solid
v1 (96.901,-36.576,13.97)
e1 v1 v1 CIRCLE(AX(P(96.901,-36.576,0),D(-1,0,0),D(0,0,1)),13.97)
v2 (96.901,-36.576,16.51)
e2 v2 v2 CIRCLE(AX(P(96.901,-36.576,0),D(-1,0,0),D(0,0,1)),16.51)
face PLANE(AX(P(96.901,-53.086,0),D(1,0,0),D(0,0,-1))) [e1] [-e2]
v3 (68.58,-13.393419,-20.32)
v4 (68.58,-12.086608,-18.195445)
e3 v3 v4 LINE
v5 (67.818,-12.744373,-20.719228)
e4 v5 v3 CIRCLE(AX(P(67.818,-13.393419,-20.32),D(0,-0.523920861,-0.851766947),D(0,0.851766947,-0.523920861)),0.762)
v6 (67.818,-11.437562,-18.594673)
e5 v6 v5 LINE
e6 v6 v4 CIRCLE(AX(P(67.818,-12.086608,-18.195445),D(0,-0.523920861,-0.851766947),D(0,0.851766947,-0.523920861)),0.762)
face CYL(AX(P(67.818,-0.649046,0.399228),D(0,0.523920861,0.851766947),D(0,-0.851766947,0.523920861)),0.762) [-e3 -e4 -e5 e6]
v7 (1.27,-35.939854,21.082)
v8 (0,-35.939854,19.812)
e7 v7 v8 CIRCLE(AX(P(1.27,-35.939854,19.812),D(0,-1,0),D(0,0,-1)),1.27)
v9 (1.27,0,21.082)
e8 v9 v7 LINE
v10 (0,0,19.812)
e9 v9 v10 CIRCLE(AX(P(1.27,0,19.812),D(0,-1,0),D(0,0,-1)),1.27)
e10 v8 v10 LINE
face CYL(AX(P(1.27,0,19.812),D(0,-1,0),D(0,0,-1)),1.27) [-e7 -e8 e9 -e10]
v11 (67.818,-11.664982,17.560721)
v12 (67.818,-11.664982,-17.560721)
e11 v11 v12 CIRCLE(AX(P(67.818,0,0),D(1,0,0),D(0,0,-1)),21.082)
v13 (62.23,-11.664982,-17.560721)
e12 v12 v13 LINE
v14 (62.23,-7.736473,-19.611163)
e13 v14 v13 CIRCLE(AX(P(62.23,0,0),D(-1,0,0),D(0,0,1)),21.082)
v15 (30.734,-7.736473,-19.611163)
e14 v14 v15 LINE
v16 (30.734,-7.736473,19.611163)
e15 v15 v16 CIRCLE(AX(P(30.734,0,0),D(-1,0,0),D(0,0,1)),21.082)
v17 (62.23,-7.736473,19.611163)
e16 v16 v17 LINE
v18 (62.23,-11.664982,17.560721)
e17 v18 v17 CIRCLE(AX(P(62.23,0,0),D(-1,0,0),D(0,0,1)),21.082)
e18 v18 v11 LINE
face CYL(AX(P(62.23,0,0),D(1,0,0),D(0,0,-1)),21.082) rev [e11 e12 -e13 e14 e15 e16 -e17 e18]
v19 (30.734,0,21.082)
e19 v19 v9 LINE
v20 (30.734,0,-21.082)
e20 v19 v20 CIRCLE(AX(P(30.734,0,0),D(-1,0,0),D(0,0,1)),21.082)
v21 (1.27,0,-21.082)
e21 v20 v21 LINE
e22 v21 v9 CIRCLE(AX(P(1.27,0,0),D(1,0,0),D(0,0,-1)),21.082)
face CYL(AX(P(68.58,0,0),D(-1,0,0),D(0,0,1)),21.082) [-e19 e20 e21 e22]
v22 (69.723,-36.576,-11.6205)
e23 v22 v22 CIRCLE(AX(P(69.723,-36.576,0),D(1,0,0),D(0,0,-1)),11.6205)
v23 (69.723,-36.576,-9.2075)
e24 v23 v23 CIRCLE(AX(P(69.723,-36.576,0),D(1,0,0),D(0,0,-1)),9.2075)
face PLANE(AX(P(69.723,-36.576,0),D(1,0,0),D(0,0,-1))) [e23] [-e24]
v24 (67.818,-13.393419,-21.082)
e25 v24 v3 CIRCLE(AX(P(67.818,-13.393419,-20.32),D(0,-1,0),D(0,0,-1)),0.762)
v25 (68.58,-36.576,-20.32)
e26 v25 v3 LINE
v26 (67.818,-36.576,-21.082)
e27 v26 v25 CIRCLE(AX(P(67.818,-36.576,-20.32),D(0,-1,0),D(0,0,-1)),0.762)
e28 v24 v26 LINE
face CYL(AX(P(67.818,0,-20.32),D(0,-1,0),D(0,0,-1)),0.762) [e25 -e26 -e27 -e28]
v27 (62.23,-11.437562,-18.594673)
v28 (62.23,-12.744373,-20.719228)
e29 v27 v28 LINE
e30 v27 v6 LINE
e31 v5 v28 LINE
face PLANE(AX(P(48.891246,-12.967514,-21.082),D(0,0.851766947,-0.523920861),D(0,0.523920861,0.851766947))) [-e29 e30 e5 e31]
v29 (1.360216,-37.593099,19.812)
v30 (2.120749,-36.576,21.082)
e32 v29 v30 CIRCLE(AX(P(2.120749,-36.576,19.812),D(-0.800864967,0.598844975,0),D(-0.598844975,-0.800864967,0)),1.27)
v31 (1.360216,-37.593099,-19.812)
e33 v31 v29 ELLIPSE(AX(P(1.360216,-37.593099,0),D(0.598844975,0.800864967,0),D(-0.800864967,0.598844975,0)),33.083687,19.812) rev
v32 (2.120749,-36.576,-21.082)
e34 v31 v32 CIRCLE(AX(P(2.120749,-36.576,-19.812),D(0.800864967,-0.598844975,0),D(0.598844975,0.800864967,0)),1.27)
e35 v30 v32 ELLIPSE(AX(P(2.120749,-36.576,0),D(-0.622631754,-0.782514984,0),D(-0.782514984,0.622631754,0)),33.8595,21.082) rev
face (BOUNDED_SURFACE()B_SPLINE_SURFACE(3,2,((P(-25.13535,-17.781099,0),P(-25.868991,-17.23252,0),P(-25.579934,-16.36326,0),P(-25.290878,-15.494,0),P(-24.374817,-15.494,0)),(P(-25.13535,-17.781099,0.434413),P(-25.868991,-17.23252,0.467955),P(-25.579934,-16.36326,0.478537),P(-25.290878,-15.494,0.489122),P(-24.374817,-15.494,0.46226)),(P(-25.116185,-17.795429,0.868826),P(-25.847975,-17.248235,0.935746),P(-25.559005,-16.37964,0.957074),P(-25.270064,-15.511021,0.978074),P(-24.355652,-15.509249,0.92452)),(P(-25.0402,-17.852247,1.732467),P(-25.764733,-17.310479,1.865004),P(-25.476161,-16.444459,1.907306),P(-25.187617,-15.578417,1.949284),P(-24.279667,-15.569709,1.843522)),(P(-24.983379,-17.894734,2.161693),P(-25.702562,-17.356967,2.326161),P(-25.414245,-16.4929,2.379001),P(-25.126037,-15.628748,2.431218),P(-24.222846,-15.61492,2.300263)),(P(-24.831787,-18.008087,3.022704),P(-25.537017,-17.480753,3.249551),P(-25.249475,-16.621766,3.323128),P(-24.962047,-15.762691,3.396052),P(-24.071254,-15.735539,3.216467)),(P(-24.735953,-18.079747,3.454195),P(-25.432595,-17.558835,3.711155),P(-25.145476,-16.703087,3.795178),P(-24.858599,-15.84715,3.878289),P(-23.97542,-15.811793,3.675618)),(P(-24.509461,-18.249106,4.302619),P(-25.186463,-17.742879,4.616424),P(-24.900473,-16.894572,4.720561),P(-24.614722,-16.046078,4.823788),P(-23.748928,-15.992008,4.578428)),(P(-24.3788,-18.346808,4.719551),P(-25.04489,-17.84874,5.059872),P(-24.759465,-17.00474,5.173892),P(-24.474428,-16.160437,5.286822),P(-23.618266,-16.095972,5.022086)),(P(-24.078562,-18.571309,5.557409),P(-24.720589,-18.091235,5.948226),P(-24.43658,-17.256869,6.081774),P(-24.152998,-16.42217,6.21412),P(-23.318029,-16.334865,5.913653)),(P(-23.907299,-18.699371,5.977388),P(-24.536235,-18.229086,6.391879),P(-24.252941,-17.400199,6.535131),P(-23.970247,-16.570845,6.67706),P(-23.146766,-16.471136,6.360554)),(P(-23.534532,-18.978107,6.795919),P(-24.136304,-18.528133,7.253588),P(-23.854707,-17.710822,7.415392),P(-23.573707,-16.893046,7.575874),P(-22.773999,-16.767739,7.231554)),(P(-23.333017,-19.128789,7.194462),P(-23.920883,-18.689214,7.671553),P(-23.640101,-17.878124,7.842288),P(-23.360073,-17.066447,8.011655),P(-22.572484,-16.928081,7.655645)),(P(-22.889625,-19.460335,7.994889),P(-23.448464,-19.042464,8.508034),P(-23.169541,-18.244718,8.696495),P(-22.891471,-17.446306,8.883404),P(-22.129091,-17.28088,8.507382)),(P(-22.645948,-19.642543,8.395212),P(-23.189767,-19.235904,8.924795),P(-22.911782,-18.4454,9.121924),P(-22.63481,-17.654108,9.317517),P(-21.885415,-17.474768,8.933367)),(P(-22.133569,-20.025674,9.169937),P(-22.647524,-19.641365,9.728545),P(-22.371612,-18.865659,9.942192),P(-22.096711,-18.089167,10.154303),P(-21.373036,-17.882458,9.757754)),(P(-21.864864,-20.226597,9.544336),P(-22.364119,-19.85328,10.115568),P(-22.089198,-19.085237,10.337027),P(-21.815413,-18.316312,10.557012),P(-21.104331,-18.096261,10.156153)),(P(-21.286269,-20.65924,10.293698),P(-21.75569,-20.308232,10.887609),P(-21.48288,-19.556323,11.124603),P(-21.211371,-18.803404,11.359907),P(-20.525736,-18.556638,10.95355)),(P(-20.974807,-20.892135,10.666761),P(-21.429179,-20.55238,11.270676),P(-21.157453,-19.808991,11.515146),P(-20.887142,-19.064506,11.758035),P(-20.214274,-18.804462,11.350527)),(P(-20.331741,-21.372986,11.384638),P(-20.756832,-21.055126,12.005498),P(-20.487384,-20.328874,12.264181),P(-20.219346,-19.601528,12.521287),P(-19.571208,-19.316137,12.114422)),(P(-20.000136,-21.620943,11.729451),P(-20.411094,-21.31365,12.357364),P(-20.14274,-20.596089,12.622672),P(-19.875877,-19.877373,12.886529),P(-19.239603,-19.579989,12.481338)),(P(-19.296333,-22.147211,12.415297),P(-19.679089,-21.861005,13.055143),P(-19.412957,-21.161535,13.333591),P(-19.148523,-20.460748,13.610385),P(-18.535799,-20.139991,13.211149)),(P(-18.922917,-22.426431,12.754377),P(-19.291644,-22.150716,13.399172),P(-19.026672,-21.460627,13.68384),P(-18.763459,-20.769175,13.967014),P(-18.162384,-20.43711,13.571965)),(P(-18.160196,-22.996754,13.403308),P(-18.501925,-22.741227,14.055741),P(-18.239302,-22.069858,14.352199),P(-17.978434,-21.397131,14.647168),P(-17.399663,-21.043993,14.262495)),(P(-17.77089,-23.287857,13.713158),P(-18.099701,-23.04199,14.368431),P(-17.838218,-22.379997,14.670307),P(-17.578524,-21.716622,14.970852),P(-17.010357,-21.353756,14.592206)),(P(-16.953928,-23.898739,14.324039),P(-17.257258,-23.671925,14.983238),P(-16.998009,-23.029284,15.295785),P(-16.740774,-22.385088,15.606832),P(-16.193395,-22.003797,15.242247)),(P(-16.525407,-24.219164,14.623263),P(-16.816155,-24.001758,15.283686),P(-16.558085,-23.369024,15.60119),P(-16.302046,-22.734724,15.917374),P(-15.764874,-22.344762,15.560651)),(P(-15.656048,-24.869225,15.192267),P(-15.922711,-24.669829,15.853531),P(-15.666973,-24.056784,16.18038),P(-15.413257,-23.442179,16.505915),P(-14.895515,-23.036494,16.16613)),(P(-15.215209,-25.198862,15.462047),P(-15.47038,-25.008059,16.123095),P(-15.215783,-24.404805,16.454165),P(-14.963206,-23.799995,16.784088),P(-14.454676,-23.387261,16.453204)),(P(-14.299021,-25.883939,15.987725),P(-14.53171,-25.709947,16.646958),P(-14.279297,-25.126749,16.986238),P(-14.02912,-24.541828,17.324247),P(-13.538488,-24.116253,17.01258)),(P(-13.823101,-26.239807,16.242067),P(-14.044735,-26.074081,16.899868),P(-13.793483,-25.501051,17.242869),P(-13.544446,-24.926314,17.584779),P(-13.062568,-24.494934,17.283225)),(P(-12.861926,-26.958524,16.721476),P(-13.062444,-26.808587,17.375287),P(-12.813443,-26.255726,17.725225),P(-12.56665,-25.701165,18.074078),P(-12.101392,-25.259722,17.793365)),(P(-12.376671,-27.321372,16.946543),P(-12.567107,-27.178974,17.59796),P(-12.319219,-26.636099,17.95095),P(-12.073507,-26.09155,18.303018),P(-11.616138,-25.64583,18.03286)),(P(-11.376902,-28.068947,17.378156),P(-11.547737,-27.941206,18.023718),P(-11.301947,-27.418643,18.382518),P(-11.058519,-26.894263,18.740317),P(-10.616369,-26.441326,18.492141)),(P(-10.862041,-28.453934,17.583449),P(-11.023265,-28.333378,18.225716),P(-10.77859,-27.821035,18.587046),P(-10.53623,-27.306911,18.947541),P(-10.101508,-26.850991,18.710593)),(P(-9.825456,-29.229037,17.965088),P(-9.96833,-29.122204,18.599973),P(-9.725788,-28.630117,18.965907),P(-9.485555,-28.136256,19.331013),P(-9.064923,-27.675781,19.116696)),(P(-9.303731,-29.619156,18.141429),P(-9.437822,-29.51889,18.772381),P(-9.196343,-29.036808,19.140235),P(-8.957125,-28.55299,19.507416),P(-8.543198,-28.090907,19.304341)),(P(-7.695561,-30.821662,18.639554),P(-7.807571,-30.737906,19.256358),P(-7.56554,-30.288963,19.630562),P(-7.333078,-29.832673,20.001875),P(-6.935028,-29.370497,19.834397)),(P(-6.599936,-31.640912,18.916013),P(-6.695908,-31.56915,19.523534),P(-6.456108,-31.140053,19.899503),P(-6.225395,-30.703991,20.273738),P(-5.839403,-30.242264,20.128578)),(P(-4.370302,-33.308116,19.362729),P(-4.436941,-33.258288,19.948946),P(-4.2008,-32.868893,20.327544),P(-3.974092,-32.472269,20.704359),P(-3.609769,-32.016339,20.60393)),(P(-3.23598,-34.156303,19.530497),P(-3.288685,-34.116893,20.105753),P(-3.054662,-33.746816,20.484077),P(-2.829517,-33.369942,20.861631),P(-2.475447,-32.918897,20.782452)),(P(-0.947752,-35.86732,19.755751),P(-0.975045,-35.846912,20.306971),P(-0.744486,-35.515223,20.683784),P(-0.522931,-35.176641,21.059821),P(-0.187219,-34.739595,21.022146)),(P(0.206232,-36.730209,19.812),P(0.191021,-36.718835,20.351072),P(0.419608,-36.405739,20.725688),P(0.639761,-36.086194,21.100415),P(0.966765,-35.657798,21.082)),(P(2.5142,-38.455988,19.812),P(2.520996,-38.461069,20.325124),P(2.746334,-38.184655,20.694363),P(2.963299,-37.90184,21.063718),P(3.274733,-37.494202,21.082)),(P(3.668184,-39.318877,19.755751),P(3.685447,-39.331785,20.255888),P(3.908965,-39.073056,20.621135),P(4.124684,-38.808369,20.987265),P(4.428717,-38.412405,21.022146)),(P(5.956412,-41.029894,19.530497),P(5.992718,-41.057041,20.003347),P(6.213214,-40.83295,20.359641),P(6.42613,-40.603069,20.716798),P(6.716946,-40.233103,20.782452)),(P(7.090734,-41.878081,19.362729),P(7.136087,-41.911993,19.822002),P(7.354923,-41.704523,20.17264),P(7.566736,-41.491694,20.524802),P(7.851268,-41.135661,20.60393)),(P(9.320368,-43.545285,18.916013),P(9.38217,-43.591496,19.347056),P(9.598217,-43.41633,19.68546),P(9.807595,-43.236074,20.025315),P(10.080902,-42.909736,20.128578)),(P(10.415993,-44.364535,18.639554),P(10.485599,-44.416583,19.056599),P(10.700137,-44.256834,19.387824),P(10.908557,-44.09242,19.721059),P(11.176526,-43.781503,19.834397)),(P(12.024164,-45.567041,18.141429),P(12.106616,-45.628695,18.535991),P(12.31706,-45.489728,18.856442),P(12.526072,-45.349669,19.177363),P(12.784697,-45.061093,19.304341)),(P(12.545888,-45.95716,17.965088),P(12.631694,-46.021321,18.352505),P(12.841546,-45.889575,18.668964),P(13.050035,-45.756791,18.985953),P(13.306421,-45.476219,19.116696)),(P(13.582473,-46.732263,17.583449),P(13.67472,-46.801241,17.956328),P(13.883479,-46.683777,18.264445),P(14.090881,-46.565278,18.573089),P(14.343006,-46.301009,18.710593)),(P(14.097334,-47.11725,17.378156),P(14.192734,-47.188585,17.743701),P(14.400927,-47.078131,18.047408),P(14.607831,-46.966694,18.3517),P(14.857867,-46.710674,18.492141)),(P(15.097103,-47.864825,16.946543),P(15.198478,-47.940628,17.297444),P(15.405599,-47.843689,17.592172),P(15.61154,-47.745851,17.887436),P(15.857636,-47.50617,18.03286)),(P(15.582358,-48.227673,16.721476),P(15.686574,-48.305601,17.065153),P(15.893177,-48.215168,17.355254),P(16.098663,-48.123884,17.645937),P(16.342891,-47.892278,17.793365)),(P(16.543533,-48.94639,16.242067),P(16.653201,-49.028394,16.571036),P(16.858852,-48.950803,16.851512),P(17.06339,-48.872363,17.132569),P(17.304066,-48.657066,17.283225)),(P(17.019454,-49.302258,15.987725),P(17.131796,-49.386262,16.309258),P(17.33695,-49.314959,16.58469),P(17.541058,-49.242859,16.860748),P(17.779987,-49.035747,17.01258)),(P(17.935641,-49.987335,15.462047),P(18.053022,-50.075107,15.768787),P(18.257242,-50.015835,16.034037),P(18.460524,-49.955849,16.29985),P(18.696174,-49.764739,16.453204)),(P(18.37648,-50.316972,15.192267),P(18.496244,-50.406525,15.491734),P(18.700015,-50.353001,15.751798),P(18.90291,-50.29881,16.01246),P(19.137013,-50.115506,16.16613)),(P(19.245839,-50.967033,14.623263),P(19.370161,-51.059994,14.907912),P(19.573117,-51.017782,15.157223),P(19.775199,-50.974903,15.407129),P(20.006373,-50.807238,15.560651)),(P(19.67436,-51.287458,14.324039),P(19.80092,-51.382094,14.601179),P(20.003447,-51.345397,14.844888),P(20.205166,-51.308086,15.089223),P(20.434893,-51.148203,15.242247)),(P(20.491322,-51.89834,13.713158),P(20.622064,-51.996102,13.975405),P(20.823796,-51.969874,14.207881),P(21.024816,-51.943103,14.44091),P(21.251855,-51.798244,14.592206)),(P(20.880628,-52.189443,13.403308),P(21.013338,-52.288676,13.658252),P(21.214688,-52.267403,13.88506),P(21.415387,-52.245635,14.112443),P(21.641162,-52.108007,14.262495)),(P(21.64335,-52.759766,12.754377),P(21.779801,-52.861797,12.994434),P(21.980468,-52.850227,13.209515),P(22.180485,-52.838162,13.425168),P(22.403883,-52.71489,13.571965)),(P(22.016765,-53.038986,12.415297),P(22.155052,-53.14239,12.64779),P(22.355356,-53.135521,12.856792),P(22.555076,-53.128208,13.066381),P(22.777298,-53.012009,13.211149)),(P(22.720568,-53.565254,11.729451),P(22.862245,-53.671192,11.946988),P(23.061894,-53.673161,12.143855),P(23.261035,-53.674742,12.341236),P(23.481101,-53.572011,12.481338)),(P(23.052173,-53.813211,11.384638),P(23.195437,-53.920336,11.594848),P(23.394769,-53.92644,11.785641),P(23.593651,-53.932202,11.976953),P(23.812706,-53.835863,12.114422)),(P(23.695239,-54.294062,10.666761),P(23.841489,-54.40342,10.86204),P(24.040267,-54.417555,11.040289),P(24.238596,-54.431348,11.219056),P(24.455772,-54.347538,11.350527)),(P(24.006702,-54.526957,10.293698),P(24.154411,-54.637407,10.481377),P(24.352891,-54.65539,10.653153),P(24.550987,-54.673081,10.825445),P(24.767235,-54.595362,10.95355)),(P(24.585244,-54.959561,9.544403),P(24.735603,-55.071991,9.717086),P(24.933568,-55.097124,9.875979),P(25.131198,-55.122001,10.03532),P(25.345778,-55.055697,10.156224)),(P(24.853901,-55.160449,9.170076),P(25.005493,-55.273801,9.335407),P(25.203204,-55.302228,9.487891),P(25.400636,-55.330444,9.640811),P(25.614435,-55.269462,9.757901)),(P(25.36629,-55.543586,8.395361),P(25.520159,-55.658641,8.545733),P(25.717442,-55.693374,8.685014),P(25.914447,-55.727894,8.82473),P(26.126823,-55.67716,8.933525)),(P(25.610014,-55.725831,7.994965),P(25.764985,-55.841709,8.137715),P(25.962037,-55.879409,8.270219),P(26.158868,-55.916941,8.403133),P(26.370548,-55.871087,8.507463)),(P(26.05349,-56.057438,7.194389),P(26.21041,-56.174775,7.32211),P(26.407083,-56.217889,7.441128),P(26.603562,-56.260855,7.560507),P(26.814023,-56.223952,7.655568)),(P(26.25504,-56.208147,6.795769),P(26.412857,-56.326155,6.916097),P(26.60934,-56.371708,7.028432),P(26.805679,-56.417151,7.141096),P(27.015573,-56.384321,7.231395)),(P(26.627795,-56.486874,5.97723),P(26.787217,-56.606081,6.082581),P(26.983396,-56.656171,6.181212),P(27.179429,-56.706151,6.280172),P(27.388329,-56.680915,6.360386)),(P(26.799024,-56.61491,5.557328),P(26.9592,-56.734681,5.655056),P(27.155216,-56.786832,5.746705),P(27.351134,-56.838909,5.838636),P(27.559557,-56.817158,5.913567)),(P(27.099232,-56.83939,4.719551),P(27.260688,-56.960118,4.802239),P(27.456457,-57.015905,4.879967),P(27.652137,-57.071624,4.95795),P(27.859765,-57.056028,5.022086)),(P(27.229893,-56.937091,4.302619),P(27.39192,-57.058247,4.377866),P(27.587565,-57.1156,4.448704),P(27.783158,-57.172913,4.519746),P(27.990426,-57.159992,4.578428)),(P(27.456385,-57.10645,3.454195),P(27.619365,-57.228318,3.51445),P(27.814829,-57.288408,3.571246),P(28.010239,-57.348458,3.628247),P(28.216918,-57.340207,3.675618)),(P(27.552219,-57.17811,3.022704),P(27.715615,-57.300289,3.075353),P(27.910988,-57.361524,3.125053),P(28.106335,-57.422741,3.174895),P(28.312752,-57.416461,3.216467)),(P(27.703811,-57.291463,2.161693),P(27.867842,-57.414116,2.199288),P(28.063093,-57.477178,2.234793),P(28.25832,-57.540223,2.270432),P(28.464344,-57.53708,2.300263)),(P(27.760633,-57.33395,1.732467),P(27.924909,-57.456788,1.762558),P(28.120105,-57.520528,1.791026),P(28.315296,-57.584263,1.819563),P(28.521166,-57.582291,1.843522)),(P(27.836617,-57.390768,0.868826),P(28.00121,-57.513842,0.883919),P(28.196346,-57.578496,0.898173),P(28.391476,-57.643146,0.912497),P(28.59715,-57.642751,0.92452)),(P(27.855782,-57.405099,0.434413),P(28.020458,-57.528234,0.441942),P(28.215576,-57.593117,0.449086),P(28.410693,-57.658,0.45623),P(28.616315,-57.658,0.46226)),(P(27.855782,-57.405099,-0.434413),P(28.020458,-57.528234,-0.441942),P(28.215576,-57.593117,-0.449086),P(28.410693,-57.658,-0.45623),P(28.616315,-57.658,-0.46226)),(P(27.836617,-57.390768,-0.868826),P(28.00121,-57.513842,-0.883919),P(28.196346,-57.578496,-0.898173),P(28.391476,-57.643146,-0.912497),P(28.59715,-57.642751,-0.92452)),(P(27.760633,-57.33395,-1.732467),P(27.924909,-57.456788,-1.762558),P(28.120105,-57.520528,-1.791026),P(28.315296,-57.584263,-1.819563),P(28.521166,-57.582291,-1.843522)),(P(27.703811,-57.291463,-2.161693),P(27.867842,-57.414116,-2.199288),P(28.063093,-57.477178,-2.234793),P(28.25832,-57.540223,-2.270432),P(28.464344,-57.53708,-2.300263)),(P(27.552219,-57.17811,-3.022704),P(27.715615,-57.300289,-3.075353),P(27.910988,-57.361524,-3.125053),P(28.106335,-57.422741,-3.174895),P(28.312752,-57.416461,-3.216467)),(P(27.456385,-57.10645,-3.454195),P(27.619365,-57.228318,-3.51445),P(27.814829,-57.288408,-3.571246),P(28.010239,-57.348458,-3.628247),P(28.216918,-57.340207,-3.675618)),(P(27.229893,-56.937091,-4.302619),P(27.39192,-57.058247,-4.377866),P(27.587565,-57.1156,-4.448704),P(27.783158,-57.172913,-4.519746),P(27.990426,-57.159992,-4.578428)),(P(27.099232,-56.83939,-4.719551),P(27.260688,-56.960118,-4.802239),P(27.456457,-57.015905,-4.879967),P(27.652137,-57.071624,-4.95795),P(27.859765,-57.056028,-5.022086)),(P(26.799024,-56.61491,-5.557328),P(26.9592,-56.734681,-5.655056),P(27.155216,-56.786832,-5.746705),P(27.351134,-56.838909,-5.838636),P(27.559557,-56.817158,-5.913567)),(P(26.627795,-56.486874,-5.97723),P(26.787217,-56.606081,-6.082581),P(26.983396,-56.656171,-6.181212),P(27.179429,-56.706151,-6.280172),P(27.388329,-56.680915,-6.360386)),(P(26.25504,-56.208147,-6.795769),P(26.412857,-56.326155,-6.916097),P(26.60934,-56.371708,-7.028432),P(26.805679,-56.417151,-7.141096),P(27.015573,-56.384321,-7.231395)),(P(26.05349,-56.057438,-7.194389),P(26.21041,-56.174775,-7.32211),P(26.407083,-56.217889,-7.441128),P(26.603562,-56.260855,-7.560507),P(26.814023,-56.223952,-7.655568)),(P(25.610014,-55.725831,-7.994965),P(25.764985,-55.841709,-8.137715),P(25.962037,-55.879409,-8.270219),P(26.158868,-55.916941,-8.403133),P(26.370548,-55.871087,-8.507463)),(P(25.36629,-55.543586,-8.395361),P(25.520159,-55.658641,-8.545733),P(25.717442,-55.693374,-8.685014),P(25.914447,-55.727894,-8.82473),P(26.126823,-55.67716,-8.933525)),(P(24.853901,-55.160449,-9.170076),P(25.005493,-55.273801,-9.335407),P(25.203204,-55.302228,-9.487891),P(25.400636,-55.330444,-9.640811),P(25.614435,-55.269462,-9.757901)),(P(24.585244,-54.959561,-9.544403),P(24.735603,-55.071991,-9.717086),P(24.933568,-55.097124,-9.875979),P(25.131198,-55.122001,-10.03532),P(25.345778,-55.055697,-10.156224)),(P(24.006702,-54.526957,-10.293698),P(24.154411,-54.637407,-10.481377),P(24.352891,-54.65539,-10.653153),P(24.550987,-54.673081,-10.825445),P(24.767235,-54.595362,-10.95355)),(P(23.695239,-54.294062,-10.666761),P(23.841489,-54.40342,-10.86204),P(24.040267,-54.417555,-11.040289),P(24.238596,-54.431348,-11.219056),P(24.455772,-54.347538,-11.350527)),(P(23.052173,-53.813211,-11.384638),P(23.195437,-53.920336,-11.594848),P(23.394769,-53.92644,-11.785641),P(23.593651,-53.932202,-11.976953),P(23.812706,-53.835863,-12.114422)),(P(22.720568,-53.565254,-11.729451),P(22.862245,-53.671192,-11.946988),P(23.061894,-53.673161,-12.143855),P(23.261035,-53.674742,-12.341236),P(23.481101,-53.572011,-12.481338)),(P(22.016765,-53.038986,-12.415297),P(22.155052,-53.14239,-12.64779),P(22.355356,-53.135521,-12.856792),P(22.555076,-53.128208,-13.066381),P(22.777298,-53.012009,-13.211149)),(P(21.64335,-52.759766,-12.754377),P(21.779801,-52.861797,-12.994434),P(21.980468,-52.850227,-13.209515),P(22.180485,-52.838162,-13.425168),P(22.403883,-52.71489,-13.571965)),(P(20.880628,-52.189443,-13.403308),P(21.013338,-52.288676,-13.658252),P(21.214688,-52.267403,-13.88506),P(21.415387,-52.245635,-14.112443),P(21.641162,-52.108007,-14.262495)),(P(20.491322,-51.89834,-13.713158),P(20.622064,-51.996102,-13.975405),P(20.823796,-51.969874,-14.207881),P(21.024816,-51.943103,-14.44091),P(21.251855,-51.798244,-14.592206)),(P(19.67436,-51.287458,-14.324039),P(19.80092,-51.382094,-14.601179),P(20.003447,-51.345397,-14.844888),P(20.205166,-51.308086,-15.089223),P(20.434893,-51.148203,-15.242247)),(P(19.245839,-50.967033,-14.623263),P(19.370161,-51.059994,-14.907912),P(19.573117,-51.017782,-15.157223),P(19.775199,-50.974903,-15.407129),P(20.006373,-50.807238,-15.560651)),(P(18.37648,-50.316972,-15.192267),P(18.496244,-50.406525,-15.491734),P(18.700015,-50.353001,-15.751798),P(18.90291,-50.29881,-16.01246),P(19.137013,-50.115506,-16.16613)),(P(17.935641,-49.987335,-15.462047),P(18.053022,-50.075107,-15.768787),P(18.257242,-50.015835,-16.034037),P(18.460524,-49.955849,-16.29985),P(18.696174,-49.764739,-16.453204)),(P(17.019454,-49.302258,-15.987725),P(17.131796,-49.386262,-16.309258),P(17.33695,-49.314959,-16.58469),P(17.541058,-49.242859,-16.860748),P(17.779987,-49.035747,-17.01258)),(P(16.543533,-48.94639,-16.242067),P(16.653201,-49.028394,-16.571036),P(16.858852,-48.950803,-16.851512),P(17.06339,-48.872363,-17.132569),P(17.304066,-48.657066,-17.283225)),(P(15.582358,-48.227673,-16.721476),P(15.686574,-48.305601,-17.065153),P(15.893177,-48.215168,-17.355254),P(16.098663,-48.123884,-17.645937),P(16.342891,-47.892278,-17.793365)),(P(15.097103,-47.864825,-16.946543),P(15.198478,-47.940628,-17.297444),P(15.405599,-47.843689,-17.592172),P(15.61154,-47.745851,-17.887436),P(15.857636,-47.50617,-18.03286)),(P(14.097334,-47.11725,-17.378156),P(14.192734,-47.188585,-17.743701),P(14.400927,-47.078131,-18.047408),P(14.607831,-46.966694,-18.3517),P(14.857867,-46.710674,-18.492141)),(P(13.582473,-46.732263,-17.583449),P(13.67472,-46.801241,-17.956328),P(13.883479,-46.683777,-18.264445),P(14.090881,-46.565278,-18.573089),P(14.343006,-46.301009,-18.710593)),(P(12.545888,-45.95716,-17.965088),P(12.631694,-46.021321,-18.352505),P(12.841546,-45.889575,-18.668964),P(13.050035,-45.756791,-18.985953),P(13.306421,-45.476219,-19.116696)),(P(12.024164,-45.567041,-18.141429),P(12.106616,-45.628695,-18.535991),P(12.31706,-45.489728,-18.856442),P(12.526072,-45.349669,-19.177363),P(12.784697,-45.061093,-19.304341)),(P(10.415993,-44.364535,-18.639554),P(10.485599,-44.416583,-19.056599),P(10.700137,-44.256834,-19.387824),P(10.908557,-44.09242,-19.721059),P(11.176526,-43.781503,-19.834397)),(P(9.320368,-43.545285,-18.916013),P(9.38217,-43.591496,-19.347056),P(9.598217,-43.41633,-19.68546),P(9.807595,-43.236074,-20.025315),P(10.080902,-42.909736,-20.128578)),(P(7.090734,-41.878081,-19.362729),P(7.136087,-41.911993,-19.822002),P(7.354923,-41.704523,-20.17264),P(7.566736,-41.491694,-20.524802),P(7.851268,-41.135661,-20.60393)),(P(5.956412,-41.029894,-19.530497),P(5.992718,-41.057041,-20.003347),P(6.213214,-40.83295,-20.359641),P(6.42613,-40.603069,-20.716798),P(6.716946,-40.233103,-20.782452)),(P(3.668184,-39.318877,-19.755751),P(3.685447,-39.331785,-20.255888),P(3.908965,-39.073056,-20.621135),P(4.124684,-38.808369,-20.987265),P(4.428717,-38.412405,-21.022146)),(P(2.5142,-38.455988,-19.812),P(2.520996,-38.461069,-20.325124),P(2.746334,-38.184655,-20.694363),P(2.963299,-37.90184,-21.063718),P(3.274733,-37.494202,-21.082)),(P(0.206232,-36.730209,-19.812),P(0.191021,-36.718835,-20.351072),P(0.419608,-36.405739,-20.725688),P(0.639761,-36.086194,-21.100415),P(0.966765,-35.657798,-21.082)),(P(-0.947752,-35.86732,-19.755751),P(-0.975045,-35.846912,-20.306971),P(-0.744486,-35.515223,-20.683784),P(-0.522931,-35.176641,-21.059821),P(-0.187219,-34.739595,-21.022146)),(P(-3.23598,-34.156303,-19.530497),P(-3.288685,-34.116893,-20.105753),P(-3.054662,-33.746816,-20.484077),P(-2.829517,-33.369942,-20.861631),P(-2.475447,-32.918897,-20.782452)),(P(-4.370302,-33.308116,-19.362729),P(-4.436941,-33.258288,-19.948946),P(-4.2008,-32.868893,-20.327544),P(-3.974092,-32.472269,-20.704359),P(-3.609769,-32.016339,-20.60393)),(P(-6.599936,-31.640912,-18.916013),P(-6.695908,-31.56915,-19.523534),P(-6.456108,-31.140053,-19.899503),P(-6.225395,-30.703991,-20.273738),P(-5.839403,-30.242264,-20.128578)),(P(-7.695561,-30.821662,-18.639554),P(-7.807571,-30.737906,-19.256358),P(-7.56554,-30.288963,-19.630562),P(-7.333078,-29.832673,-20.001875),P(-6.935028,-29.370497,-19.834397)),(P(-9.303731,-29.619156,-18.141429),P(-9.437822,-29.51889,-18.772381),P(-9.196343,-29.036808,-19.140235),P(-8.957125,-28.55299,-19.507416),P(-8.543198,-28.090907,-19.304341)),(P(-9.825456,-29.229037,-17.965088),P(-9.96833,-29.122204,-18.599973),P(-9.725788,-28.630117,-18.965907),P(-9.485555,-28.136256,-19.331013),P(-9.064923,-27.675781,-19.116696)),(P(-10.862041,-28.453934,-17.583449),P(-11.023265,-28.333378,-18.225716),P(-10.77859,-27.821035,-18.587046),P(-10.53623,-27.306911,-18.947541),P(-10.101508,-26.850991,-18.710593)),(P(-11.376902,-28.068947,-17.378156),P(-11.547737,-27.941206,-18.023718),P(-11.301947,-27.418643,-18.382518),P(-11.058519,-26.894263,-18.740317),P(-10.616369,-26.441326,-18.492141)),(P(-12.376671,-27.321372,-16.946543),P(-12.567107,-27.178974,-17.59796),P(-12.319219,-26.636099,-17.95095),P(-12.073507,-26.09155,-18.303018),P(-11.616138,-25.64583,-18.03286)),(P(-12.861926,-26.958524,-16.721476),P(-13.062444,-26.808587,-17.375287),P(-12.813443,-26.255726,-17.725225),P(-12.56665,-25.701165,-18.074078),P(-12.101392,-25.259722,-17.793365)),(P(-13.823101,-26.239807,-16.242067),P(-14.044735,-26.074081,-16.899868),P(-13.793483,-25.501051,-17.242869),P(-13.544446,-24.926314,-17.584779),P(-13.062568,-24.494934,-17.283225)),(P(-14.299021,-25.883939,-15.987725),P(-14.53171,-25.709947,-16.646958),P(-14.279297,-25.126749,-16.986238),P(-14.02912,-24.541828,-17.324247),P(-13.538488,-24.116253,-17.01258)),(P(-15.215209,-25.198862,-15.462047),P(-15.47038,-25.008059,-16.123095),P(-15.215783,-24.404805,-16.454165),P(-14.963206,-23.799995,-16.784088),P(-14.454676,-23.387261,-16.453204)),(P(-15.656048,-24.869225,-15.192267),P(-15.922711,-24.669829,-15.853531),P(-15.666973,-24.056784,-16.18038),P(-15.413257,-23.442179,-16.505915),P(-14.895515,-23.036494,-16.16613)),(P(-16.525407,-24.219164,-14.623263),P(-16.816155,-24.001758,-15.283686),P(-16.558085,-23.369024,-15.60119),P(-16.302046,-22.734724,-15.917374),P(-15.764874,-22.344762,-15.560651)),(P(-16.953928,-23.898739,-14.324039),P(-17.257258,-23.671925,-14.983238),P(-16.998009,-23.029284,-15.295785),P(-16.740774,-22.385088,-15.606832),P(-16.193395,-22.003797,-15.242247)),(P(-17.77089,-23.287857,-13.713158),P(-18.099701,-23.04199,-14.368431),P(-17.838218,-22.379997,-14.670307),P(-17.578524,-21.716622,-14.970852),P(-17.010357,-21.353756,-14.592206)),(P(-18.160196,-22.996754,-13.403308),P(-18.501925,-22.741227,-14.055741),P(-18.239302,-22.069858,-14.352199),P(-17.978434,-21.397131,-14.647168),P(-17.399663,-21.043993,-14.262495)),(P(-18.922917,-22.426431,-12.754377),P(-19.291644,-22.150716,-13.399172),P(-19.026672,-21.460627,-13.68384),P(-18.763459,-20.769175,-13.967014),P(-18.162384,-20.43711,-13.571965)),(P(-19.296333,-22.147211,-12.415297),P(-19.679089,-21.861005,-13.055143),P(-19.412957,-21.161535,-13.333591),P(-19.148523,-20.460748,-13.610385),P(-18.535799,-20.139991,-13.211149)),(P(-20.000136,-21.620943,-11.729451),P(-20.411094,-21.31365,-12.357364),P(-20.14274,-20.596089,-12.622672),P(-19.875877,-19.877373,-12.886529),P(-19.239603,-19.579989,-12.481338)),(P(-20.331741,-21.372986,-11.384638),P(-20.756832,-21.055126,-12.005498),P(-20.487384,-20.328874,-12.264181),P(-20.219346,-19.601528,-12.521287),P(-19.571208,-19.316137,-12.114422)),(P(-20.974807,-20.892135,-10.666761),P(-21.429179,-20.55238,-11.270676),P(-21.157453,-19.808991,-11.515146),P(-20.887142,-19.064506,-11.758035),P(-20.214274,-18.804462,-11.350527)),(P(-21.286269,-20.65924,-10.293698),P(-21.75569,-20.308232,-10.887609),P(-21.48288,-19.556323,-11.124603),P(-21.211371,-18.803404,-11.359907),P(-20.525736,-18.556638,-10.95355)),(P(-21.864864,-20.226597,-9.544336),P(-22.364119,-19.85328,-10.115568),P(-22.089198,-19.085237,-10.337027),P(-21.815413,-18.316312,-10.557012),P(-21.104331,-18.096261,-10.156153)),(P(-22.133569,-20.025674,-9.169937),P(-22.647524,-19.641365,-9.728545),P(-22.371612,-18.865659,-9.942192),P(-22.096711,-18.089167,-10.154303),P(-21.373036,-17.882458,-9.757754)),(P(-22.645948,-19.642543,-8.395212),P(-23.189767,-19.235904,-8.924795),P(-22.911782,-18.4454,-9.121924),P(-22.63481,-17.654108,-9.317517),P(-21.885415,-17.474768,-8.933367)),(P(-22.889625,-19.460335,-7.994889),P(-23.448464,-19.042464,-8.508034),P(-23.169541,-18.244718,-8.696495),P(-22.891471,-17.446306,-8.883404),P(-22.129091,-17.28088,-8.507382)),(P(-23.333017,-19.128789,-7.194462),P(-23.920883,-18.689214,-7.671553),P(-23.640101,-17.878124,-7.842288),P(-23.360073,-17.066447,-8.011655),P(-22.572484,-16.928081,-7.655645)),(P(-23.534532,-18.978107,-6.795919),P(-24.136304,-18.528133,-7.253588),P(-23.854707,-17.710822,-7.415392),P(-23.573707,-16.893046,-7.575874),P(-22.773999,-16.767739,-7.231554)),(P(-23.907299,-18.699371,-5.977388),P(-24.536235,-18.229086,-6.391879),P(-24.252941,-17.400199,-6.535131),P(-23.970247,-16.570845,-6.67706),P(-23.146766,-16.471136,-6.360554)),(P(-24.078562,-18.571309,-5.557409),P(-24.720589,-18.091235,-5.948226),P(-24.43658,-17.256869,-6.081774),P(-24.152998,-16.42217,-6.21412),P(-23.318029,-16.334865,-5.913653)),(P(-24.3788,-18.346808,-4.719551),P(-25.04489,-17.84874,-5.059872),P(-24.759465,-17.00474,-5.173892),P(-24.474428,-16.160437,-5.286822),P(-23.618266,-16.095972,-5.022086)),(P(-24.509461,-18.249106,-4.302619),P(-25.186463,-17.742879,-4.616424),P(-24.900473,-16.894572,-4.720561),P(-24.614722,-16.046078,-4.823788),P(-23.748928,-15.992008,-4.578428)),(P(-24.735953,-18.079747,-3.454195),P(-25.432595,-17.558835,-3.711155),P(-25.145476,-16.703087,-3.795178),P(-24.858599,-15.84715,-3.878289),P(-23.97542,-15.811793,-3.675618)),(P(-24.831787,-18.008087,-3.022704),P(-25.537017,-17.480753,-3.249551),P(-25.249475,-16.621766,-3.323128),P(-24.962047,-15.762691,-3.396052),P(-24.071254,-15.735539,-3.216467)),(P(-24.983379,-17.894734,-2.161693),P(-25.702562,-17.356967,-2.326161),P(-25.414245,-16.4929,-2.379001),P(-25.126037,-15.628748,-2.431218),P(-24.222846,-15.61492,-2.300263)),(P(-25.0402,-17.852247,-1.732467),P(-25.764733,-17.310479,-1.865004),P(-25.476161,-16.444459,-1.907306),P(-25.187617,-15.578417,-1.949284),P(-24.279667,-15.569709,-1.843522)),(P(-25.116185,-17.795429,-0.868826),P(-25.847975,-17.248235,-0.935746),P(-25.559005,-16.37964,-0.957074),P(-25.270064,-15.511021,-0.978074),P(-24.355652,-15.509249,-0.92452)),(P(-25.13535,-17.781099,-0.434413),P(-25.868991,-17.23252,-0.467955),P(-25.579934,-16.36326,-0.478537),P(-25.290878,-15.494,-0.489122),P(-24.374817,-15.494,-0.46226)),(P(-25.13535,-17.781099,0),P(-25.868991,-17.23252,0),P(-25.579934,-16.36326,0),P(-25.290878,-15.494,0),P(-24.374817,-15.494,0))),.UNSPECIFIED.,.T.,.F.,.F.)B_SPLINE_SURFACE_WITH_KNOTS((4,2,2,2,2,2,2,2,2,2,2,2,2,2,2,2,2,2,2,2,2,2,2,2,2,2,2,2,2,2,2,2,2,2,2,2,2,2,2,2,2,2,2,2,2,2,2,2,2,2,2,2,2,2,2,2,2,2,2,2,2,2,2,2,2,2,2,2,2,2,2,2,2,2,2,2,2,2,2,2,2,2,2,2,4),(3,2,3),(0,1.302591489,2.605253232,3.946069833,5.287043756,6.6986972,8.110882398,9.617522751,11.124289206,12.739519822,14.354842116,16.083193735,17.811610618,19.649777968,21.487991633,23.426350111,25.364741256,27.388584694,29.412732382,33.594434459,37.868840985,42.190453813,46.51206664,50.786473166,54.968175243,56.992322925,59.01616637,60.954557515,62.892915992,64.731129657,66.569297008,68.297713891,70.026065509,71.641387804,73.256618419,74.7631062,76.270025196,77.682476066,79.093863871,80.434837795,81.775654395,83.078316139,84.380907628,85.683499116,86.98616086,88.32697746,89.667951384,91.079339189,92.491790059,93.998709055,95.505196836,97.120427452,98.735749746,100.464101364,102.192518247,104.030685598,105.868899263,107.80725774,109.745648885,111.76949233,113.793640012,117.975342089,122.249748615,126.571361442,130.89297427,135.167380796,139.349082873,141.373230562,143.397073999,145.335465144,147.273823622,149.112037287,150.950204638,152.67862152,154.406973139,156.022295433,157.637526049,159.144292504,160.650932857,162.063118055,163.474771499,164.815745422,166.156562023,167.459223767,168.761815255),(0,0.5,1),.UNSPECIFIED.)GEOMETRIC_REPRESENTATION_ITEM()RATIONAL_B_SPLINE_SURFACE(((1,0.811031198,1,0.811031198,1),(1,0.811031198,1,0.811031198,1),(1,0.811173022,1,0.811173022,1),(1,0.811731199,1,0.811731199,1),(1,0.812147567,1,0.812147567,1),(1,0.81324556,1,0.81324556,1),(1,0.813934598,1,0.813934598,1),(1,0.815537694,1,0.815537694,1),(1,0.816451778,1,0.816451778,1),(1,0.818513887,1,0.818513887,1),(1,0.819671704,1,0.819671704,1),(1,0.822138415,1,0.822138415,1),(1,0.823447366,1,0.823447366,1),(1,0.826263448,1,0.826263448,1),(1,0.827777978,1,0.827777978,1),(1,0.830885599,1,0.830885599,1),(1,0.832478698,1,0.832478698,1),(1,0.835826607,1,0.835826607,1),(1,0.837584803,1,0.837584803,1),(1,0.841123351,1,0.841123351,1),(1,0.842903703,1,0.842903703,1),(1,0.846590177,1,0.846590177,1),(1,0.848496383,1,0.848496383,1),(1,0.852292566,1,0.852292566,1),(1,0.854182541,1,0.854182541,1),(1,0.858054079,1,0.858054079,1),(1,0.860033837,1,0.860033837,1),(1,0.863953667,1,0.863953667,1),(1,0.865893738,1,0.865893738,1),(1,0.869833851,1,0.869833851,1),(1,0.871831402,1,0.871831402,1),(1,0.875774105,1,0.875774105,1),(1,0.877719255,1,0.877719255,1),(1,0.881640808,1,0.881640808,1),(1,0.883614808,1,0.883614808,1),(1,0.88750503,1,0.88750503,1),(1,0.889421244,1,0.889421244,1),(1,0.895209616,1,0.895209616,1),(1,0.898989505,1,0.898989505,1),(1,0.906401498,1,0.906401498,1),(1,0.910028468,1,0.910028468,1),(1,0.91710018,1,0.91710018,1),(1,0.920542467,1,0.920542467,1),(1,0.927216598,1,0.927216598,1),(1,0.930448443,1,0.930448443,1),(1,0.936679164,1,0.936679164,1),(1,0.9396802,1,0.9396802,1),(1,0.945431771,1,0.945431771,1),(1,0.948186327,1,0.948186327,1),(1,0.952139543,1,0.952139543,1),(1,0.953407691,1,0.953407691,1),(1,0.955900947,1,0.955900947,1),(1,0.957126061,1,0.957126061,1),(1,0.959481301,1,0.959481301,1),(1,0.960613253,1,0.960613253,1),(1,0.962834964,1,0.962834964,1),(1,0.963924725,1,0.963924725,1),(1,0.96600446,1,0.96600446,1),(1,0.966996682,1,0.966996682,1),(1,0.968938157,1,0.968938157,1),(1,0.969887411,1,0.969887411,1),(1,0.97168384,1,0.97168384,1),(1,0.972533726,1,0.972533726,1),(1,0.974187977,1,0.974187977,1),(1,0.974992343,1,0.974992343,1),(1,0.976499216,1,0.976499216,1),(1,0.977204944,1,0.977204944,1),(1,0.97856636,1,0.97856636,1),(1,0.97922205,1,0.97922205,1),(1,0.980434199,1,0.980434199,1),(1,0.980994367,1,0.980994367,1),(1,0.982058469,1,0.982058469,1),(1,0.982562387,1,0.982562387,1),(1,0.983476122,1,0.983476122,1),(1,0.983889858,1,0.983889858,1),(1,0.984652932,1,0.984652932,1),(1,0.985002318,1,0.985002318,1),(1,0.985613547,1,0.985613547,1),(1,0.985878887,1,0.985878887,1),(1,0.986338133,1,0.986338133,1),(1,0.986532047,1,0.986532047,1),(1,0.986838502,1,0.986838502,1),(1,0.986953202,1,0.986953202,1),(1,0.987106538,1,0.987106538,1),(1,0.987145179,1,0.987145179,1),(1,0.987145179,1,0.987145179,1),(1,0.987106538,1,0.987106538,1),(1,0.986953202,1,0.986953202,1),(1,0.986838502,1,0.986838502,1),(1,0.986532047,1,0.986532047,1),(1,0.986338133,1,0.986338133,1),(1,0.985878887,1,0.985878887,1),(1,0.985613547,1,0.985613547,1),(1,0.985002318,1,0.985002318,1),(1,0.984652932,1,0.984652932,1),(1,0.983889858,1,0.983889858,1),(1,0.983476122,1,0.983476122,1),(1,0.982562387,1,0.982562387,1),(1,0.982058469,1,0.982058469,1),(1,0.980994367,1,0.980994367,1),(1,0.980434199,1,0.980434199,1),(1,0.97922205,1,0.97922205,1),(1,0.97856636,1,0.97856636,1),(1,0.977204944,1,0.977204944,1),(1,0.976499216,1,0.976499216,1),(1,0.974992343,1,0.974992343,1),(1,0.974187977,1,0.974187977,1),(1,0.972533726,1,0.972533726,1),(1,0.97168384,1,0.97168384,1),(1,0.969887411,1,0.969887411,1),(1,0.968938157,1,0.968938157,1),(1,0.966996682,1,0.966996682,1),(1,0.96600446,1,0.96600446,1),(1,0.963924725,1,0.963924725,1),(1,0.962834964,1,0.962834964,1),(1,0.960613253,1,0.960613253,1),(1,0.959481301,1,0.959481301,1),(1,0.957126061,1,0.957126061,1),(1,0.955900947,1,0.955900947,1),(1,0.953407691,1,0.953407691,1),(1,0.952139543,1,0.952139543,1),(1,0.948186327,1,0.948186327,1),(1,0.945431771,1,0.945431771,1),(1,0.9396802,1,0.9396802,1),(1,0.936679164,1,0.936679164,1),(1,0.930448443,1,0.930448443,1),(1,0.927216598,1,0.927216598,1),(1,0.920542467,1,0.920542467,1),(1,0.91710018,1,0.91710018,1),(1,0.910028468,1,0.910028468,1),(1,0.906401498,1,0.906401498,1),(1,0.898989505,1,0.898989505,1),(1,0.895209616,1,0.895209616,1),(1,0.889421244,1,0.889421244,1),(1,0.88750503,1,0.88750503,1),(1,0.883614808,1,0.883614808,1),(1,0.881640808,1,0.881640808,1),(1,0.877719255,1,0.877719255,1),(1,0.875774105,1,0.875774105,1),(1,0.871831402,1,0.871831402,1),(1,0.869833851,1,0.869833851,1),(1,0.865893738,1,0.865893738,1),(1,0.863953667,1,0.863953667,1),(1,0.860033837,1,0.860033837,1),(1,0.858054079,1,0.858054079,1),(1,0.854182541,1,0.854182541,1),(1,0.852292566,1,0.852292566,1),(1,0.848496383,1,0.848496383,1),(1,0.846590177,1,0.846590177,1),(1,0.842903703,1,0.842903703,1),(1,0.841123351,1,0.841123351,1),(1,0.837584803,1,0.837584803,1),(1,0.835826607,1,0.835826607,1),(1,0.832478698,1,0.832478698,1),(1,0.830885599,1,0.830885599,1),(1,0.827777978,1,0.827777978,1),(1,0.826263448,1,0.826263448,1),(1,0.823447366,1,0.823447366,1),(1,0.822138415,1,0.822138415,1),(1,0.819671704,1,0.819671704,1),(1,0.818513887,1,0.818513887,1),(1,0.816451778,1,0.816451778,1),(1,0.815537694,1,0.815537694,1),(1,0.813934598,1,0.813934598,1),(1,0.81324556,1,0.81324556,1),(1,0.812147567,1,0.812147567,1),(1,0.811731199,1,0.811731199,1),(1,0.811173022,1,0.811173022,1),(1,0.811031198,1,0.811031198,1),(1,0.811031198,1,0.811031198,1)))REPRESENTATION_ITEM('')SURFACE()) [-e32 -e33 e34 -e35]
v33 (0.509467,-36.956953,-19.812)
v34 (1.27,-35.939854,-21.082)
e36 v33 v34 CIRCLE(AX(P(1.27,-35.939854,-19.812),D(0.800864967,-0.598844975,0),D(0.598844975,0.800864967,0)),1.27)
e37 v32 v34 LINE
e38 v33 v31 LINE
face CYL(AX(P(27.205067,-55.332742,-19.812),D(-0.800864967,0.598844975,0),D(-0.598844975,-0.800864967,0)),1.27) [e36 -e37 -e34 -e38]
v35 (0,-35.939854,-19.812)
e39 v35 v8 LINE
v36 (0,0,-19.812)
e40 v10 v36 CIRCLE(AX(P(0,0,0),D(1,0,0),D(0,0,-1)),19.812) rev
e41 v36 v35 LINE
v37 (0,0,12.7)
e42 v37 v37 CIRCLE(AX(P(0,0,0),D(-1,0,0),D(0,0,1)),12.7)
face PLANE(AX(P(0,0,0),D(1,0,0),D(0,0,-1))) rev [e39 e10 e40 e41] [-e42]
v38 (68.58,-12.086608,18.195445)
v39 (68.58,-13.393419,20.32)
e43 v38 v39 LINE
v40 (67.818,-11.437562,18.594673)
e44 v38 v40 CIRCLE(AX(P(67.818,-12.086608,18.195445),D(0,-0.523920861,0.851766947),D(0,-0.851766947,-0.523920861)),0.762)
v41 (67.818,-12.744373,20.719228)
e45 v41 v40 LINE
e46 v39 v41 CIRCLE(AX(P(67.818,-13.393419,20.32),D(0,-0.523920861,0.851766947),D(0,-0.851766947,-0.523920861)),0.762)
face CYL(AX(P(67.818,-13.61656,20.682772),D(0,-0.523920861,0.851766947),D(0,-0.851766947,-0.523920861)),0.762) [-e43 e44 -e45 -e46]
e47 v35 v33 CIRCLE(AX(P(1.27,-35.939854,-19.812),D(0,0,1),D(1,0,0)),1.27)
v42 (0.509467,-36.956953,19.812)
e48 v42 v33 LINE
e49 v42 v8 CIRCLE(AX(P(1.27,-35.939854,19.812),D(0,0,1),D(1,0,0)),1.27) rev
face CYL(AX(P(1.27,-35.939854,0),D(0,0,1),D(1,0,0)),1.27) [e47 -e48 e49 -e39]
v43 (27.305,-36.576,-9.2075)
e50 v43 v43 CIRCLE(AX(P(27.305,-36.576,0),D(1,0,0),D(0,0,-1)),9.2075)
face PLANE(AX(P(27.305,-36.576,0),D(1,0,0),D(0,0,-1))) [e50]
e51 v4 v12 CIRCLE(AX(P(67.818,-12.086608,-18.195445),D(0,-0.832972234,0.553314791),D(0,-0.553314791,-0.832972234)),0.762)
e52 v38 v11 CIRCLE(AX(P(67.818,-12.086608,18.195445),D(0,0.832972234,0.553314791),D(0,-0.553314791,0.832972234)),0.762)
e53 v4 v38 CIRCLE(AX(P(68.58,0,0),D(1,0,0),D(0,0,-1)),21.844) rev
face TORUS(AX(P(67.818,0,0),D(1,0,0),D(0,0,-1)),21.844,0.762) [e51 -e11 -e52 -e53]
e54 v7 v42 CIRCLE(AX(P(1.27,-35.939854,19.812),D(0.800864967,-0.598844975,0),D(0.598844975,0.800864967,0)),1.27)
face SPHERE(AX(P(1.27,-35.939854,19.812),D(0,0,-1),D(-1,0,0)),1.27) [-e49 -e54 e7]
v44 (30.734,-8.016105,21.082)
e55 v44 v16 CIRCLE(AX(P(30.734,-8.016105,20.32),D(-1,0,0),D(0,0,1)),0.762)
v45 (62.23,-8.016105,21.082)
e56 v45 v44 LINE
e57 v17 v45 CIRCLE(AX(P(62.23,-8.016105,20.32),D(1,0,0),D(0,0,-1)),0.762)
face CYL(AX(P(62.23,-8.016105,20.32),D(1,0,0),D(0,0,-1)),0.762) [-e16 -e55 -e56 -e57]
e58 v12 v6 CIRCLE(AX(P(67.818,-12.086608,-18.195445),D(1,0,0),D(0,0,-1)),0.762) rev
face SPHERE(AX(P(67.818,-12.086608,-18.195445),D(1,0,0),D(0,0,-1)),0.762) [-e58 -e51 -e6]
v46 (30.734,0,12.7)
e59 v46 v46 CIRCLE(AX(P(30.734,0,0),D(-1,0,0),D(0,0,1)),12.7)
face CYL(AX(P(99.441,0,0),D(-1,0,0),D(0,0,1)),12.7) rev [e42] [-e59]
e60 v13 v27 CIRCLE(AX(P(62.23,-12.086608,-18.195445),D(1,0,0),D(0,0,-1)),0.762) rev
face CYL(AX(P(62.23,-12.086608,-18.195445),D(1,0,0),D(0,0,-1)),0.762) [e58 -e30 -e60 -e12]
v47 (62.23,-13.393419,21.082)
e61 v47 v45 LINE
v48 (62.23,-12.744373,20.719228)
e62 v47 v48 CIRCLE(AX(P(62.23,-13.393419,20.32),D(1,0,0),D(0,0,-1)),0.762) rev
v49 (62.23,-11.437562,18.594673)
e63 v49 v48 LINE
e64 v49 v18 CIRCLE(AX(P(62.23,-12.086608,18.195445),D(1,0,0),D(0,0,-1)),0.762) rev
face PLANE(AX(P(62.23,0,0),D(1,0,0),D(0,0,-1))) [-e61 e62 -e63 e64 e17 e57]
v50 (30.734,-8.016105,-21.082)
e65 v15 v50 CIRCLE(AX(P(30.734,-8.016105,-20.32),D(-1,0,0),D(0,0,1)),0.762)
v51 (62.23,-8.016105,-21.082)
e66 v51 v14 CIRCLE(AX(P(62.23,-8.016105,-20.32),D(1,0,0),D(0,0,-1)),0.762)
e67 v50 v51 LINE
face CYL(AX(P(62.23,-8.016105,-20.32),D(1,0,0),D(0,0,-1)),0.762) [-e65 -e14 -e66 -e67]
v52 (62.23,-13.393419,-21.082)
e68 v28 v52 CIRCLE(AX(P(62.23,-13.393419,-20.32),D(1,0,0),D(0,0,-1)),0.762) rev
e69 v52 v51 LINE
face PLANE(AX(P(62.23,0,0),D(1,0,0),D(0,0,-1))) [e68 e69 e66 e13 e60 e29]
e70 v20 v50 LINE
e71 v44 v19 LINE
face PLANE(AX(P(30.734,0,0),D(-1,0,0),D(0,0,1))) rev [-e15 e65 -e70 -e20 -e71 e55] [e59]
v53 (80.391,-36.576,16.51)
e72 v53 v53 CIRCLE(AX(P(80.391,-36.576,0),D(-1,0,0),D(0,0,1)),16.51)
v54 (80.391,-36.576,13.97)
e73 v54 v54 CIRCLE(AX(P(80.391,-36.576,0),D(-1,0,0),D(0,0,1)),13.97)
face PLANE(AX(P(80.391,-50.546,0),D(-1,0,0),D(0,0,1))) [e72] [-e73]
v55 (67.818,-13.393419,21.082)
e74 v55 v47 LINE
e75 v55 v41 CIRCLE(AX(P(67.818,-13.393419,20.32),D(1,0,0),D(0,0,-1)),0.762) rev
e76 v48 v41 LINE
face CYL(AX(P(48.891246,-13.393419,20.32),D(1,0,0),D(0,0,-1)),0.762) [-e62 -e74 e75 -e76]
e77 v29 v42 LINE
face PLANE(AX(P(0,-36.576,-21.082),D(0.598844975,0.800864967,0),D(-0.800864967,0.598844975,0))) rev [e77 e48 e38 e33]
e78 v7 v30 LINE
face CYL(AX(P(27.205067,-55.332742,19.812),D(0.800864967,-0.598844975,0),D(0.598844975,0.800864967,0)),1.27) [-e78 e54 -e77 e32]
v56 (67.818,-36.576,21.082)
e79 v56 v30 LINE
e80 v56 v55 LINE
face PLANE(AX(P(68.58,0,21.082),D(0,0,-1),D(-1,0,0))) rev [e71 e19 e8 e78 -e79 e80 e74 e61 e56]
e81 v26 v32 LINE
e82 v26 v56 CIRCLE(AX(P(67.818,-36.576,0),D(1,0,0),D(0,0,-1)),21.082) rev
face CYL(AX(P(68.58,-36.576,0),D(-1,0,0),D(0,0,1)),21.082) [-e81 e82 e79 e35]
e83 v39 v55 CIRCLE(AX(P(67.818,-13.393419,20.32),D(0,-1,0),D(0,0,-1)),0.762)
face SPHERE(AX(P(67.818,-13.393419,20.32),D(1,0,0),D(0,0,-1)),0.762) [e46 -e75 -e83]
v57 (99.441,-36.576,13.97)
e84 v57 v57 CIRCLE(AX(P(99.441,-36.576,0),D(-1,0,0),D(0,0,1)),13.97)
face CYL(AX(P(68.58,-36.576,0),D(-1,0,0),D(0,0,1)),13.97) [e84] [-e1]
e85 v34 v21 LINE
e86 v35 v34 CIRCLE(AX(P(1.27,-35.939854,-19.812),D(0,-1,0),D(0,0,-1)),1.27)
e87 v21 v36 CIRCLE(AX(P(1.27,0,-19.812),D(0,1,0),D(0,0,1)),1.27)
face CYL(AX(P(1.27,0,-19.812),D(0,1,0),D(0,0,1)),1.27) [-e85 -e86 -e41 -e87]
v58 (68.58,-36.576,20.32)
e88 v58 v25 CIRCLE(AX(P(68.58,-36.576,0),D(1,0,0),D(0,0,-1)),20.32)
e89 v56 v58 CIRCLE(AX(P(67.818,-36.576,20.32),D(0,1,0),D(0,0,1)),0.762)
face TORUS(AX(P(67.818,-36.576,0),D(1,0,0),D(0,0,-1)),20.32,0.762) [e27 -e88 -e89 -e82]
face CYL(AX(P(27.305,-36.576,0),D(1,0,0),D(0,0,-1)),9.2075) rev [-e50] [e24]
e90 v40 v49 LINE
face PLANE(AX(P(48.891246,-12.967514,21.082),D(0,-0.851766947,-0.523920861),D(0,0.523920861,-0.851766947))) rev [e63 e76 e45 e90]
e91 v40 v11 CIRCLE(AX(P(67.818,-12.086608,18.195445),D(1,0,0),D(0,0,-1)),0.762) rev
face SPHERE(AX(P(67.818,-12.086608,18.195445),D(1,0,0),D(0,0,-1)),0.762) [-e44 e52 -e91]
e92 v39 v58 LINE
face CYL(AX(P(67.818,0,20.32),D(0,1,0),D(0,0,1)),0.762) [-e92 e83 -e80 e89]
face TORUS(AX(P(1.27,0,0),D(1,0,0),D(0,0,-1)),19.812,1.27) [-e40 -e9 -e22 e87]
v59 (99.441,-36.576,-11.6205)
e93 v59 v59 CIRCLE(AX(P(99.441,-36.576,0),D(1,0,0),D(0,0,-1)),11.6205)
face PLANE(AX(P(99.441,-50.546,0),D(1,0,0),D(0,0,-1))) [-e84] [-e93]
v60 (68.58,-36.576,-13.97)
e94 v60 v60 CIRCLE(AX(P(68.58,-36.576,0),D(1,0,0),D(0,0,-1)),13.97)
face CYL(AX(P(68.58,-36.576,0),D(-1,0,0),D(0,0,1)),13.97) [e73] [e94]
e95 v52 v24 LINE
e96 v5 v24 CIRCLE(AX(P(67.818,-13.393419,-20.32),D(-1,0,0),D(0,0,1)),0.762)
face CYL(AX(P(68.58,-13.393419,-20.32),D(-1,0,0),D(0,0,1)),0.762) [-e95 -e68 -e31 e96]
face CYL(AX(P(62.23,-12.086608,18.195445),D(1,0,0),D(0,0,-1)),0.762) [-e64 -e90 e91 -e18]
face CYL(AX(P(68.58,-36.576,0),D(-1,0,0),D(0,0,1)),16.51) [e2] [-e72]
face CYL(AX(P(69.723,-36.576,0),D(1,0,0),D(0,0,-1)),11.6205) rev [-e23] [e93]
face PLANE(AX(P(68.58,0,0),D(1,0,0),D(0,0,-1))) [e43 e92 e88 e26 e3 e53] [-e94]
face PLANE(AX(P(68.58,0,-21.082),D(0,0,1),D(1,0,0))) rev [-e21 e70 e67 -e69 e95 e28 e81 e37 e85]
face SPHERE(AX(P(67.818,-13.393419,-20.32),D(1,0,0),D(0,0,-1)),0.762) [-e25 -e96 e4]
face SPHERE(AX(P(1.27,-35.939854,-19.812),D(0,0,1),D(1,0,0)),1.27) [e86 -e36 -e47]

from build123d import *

# Parameters (mm, degrees)
BOSS_EXTRUDE1_DEPTH     = 68.58
CUT_EXTRUDE1_START      = -6.35
SKETCH2_R               = 21.082
CUT_EXTRUDE1_DEPTH      = 6.35
CUT_EXTRUDE2_START      = -6.35
CUT_EXTRUDE2_DEPTH      = 6.35
CUT_EXTRUDE3_DEPTH      = 93.044076876
CUT_EXTRUDE3_DEPTH_BACK = 93.044076876
FILLET1_R               = 1.27
CUT_EXTRUDE6_START      = 31.496
SKETCH8_R               = 21.082
CUT_EXTRUDE6_DEPTH      = 31.496
SKETCH9_R               = 12.7
CUT_EXTRUDE7_DEPTH      = 117.864914259
FILLET7_R               = 1.27
FILLET8_START           = 30.734
FILLET8_DEPTH           = 31.496
FILLET9_R               = 0.762
FILLET10_R              = 0.762
SKETCH10_R              = 11.6205
CUT_EXTRUDE8_DEPTH      = 29.718
SKETCH11_R              = 9.2075
CUT_EXTRUDE9_DEPTH      = 42.418


with BuildPart() as part:
    # Sketch1 → Boss-Extrude1 (new body)
    with BuildSketch(Plane(origin=(0, 0, 0), x_dir=(0, 0, -1), z_dir=(1, 0, 0))):
        with BuildLine():
            Line((-21.082, 0), (-21.082, -36.576))
            ThreePointArc((-21.082, -36.576), (0, -57.658), (21.082, -36.576))
            Line((21.082, -36.576), (21.082, 0))
            ThreePointArc((21.082, 0), (0, 21.082), (-21.082, 0))
        make_face()
    extrude(amount=BOSS_EXTRUDE1_DEPTH)

    # Sketch2 → Cut-Extrude1 (cut)
    with BuildSketch(Plane(origin=(68.58, 0, 0), x_dir=(0, 0, -1), z_dir=(1, 0, 0)).offset(CUT_EXTRUDE1_START)):
        Circle(SKETCH2_R)
    extrude(amount=CUT_EXTRUDE1_DEPTH, mode=Mode.SUBTRACT)

    # Sketch3 → Cut-Extrude2 (cut)
    with BuildSketch(Plane(origin=(68.58, 0, 0), x_dir=(0, 0, -1), z_dir=(1, 0, 0)).offset(CUT_EXTRUDE2_START)):
        with BuildLine():
            Line((-21.082, 0), (-21.082, -12.967513736))
            Line((-21.082, -12.967513736), (-17.956950774, -11.045299584))
            ThreePointArc((-17.956950774, -11.045299584), (-20.285698906, -5.739437593), (-21.082, 0))
        make_face()
    cut_extrude2 = extrude(amount=CUT_EXTRUDE2_DEPTH, mode=Mode.SUBTRACT)

    # Mirror2: Cut-Extrude2 across plane
    add(cut_extrude2.mirror(Plane.XY), mode=Mode.SUBTRACT)

    # Sketch4 → Cut-Extrude3 (cut, two sides: drawn at the far end of the back side and taken through both)
    with BuildSketch(Plane.XY.offset(-CUT_EXTRUDE3_DEPTH_BACK)):
        Polygon((0, -36.576), (28.194, -57.658), (0, -57.658), align=None)
    extrude(amount=CUT_EXTRUDE3_DEPTH + CUT_EXTRUDE3_DEPTH_BACK, mode=Mode.SUBTRACT)

    # Sketch5 → Revolve1 (revolve)
    with BuildSketch(Plane.XY, mode=Mode.PRIVATE) as revolve1_sk:
        Polygon((68.58, -50.546), (80.391, -50.546), (80.391, -53.086), (96.901, -53.086), (96.901, -50.546), (99.441, -50.546), (99.441, -36.576), (68.58, -36.576), align=None)
    revolve(revolve1_sk.sketch.rotate(Axis((68.58, -36.576, 0), (1, 0, 0)), 270), axis=Axis((68.58, -36.576, 0), (1, 0, 0)))

    # Fillet1
    fillet1_edges = [part.edges().sort_by_distance(p)[0] for p in [
        (0, -36.576, 0),
    ]]
    fillet(fillet1_edges, radius=FILLET1_R)

    # Sketch8 → Cut-Extrude6 (cut)
    with BuildSketch(Plane.ZY.offset(-62.23).offset(CUT_EXTRUDE6_START)):
        Circle(SKETCH8_R)
    extrude(amount=-CUT_EXTRUDE6_DEPTH, mode=Mode.SUBTRACT)

    # Sketch9 → Cut-Extrude7 (cut, through all)
    with BuildSketch(Plane.ZY):
        Circle(SKETCH9_R)
    extrude(amount=-CUT_EXTRUDE7_DEPTH, mode=Mode.SUBTRACT)

    # Fillet7
    fillet7_edges = [part.edges().sort_by_distance(p)[0] for p in [
        (0, -17.969927102, 21.082),
        (0, 21.082, 0),
        (0, -17.969927102, -21.082),
        (0.043445634, -36.269193524, 21.082),
        (17.697322345, -49.809132924, 16.411426416),
        (0.320832952, -36.783644414, -21.080977392),
        (0.320832952, -36.783644414, 21.080977392),
        (0.043445634, -36.269193524, -21.082),
    ]]
    fillet(fillet7_edges, radius=FILLET7_R)

    # Fillet8: read off the stored shape, not the designer's step
    # Fillet8 outline → Fillet8 (cut)
    with BuildSketch(Plane.YZ.offset(FILLET8_START)):
        with BuildLine():
            ThreePointArc((-8.01610479, 21.082), (-7.267513461, 20.462320144), (-7.736473227, 19.611162791))
            ThreePointArc((-7.736473227, 19.611162791), (-3.937523971, 20.711026749), (0, 21.082))
            Line((0, 21.082), (-8.01610479, 21.082))
        make_face()
        with BuildLine():
            ThreePointArc((-7.736473227, -19.611162791), (-7.267513461, -20.462320144), (-8.01610479, -21.082))
            Line((-8.01610479, -21.082), (0, -21.082))
            ThreePointArc((0, -21.082), (-3.937523971, -20.711026749), (-7.736473227, -19.611162791))
        make_face()
    extrude(amount=FILLET8_DEPTH, mode=Mode.SUBTRACT)

    # Fillet9
    fillet9_edges = [part.edges().sort_by_distance(p)[0] for p in [
        (65.405, -11.045299584, 17.956950774),
        (65.405, -12.967513736, 21.082),
        (65.405, -12.967513736, -21.082),
        (65.405, -11.045299584, -17.956950774),
    ]]
    fillet(fillet9_edges, radius=FILLET9_R)

    # Fillet10
    fillet10_edges = [part.edges().sort_by_distance(p)[0] for p in [
        (68.58, -57.658, 0),
        (68.58, -24.984709663, -21.082),
        (68.58, -12.090967399, -19.65695043),
        (68.58, -21.082, 0),
        (68.58, -12.090967399, 19.65695043),
        (68.58, -24.984709663, 21.082),
        (68.58, -13.021644868, 20.985152428),
        (68.58, -11.342397813, 18.031754442),
        (68.58, -11.342397813, -18.031754442),
        (68.58, -13.021644868, -20.985152428),
    ]]
    fillet(fillet10_edges, radius=FILLET10_R)

    # Sketch10 → Cut-Extrude8 (cut)
    with BuildSketch(Plane(origin=(99.441, 0, 0), x_dir=(0, 0, -1), z_dir=(1, 0, 0))):
        with Locations((0, -36.576)):
            Circle(SKETCH10_R)
    extrude(amount=-CUT_EXTRUDE8_DEPTH, mode=Mode.SUBTRACT)

    # Sketch11 → Cut-Extrude9 (cut)
    with BuildSketch(Plane(origin=(69.723, 0, 0), x_dir=(0, 0, -1), z_dir=(1, 0, 0))):
        with Locations((0, -36.576)):
            Circle(SKETCH11_R)
    extrude(amount=-CUT_EXTRUDE9_DEPTH, mode=Mode.SUBTRACT)


solid = part.part
